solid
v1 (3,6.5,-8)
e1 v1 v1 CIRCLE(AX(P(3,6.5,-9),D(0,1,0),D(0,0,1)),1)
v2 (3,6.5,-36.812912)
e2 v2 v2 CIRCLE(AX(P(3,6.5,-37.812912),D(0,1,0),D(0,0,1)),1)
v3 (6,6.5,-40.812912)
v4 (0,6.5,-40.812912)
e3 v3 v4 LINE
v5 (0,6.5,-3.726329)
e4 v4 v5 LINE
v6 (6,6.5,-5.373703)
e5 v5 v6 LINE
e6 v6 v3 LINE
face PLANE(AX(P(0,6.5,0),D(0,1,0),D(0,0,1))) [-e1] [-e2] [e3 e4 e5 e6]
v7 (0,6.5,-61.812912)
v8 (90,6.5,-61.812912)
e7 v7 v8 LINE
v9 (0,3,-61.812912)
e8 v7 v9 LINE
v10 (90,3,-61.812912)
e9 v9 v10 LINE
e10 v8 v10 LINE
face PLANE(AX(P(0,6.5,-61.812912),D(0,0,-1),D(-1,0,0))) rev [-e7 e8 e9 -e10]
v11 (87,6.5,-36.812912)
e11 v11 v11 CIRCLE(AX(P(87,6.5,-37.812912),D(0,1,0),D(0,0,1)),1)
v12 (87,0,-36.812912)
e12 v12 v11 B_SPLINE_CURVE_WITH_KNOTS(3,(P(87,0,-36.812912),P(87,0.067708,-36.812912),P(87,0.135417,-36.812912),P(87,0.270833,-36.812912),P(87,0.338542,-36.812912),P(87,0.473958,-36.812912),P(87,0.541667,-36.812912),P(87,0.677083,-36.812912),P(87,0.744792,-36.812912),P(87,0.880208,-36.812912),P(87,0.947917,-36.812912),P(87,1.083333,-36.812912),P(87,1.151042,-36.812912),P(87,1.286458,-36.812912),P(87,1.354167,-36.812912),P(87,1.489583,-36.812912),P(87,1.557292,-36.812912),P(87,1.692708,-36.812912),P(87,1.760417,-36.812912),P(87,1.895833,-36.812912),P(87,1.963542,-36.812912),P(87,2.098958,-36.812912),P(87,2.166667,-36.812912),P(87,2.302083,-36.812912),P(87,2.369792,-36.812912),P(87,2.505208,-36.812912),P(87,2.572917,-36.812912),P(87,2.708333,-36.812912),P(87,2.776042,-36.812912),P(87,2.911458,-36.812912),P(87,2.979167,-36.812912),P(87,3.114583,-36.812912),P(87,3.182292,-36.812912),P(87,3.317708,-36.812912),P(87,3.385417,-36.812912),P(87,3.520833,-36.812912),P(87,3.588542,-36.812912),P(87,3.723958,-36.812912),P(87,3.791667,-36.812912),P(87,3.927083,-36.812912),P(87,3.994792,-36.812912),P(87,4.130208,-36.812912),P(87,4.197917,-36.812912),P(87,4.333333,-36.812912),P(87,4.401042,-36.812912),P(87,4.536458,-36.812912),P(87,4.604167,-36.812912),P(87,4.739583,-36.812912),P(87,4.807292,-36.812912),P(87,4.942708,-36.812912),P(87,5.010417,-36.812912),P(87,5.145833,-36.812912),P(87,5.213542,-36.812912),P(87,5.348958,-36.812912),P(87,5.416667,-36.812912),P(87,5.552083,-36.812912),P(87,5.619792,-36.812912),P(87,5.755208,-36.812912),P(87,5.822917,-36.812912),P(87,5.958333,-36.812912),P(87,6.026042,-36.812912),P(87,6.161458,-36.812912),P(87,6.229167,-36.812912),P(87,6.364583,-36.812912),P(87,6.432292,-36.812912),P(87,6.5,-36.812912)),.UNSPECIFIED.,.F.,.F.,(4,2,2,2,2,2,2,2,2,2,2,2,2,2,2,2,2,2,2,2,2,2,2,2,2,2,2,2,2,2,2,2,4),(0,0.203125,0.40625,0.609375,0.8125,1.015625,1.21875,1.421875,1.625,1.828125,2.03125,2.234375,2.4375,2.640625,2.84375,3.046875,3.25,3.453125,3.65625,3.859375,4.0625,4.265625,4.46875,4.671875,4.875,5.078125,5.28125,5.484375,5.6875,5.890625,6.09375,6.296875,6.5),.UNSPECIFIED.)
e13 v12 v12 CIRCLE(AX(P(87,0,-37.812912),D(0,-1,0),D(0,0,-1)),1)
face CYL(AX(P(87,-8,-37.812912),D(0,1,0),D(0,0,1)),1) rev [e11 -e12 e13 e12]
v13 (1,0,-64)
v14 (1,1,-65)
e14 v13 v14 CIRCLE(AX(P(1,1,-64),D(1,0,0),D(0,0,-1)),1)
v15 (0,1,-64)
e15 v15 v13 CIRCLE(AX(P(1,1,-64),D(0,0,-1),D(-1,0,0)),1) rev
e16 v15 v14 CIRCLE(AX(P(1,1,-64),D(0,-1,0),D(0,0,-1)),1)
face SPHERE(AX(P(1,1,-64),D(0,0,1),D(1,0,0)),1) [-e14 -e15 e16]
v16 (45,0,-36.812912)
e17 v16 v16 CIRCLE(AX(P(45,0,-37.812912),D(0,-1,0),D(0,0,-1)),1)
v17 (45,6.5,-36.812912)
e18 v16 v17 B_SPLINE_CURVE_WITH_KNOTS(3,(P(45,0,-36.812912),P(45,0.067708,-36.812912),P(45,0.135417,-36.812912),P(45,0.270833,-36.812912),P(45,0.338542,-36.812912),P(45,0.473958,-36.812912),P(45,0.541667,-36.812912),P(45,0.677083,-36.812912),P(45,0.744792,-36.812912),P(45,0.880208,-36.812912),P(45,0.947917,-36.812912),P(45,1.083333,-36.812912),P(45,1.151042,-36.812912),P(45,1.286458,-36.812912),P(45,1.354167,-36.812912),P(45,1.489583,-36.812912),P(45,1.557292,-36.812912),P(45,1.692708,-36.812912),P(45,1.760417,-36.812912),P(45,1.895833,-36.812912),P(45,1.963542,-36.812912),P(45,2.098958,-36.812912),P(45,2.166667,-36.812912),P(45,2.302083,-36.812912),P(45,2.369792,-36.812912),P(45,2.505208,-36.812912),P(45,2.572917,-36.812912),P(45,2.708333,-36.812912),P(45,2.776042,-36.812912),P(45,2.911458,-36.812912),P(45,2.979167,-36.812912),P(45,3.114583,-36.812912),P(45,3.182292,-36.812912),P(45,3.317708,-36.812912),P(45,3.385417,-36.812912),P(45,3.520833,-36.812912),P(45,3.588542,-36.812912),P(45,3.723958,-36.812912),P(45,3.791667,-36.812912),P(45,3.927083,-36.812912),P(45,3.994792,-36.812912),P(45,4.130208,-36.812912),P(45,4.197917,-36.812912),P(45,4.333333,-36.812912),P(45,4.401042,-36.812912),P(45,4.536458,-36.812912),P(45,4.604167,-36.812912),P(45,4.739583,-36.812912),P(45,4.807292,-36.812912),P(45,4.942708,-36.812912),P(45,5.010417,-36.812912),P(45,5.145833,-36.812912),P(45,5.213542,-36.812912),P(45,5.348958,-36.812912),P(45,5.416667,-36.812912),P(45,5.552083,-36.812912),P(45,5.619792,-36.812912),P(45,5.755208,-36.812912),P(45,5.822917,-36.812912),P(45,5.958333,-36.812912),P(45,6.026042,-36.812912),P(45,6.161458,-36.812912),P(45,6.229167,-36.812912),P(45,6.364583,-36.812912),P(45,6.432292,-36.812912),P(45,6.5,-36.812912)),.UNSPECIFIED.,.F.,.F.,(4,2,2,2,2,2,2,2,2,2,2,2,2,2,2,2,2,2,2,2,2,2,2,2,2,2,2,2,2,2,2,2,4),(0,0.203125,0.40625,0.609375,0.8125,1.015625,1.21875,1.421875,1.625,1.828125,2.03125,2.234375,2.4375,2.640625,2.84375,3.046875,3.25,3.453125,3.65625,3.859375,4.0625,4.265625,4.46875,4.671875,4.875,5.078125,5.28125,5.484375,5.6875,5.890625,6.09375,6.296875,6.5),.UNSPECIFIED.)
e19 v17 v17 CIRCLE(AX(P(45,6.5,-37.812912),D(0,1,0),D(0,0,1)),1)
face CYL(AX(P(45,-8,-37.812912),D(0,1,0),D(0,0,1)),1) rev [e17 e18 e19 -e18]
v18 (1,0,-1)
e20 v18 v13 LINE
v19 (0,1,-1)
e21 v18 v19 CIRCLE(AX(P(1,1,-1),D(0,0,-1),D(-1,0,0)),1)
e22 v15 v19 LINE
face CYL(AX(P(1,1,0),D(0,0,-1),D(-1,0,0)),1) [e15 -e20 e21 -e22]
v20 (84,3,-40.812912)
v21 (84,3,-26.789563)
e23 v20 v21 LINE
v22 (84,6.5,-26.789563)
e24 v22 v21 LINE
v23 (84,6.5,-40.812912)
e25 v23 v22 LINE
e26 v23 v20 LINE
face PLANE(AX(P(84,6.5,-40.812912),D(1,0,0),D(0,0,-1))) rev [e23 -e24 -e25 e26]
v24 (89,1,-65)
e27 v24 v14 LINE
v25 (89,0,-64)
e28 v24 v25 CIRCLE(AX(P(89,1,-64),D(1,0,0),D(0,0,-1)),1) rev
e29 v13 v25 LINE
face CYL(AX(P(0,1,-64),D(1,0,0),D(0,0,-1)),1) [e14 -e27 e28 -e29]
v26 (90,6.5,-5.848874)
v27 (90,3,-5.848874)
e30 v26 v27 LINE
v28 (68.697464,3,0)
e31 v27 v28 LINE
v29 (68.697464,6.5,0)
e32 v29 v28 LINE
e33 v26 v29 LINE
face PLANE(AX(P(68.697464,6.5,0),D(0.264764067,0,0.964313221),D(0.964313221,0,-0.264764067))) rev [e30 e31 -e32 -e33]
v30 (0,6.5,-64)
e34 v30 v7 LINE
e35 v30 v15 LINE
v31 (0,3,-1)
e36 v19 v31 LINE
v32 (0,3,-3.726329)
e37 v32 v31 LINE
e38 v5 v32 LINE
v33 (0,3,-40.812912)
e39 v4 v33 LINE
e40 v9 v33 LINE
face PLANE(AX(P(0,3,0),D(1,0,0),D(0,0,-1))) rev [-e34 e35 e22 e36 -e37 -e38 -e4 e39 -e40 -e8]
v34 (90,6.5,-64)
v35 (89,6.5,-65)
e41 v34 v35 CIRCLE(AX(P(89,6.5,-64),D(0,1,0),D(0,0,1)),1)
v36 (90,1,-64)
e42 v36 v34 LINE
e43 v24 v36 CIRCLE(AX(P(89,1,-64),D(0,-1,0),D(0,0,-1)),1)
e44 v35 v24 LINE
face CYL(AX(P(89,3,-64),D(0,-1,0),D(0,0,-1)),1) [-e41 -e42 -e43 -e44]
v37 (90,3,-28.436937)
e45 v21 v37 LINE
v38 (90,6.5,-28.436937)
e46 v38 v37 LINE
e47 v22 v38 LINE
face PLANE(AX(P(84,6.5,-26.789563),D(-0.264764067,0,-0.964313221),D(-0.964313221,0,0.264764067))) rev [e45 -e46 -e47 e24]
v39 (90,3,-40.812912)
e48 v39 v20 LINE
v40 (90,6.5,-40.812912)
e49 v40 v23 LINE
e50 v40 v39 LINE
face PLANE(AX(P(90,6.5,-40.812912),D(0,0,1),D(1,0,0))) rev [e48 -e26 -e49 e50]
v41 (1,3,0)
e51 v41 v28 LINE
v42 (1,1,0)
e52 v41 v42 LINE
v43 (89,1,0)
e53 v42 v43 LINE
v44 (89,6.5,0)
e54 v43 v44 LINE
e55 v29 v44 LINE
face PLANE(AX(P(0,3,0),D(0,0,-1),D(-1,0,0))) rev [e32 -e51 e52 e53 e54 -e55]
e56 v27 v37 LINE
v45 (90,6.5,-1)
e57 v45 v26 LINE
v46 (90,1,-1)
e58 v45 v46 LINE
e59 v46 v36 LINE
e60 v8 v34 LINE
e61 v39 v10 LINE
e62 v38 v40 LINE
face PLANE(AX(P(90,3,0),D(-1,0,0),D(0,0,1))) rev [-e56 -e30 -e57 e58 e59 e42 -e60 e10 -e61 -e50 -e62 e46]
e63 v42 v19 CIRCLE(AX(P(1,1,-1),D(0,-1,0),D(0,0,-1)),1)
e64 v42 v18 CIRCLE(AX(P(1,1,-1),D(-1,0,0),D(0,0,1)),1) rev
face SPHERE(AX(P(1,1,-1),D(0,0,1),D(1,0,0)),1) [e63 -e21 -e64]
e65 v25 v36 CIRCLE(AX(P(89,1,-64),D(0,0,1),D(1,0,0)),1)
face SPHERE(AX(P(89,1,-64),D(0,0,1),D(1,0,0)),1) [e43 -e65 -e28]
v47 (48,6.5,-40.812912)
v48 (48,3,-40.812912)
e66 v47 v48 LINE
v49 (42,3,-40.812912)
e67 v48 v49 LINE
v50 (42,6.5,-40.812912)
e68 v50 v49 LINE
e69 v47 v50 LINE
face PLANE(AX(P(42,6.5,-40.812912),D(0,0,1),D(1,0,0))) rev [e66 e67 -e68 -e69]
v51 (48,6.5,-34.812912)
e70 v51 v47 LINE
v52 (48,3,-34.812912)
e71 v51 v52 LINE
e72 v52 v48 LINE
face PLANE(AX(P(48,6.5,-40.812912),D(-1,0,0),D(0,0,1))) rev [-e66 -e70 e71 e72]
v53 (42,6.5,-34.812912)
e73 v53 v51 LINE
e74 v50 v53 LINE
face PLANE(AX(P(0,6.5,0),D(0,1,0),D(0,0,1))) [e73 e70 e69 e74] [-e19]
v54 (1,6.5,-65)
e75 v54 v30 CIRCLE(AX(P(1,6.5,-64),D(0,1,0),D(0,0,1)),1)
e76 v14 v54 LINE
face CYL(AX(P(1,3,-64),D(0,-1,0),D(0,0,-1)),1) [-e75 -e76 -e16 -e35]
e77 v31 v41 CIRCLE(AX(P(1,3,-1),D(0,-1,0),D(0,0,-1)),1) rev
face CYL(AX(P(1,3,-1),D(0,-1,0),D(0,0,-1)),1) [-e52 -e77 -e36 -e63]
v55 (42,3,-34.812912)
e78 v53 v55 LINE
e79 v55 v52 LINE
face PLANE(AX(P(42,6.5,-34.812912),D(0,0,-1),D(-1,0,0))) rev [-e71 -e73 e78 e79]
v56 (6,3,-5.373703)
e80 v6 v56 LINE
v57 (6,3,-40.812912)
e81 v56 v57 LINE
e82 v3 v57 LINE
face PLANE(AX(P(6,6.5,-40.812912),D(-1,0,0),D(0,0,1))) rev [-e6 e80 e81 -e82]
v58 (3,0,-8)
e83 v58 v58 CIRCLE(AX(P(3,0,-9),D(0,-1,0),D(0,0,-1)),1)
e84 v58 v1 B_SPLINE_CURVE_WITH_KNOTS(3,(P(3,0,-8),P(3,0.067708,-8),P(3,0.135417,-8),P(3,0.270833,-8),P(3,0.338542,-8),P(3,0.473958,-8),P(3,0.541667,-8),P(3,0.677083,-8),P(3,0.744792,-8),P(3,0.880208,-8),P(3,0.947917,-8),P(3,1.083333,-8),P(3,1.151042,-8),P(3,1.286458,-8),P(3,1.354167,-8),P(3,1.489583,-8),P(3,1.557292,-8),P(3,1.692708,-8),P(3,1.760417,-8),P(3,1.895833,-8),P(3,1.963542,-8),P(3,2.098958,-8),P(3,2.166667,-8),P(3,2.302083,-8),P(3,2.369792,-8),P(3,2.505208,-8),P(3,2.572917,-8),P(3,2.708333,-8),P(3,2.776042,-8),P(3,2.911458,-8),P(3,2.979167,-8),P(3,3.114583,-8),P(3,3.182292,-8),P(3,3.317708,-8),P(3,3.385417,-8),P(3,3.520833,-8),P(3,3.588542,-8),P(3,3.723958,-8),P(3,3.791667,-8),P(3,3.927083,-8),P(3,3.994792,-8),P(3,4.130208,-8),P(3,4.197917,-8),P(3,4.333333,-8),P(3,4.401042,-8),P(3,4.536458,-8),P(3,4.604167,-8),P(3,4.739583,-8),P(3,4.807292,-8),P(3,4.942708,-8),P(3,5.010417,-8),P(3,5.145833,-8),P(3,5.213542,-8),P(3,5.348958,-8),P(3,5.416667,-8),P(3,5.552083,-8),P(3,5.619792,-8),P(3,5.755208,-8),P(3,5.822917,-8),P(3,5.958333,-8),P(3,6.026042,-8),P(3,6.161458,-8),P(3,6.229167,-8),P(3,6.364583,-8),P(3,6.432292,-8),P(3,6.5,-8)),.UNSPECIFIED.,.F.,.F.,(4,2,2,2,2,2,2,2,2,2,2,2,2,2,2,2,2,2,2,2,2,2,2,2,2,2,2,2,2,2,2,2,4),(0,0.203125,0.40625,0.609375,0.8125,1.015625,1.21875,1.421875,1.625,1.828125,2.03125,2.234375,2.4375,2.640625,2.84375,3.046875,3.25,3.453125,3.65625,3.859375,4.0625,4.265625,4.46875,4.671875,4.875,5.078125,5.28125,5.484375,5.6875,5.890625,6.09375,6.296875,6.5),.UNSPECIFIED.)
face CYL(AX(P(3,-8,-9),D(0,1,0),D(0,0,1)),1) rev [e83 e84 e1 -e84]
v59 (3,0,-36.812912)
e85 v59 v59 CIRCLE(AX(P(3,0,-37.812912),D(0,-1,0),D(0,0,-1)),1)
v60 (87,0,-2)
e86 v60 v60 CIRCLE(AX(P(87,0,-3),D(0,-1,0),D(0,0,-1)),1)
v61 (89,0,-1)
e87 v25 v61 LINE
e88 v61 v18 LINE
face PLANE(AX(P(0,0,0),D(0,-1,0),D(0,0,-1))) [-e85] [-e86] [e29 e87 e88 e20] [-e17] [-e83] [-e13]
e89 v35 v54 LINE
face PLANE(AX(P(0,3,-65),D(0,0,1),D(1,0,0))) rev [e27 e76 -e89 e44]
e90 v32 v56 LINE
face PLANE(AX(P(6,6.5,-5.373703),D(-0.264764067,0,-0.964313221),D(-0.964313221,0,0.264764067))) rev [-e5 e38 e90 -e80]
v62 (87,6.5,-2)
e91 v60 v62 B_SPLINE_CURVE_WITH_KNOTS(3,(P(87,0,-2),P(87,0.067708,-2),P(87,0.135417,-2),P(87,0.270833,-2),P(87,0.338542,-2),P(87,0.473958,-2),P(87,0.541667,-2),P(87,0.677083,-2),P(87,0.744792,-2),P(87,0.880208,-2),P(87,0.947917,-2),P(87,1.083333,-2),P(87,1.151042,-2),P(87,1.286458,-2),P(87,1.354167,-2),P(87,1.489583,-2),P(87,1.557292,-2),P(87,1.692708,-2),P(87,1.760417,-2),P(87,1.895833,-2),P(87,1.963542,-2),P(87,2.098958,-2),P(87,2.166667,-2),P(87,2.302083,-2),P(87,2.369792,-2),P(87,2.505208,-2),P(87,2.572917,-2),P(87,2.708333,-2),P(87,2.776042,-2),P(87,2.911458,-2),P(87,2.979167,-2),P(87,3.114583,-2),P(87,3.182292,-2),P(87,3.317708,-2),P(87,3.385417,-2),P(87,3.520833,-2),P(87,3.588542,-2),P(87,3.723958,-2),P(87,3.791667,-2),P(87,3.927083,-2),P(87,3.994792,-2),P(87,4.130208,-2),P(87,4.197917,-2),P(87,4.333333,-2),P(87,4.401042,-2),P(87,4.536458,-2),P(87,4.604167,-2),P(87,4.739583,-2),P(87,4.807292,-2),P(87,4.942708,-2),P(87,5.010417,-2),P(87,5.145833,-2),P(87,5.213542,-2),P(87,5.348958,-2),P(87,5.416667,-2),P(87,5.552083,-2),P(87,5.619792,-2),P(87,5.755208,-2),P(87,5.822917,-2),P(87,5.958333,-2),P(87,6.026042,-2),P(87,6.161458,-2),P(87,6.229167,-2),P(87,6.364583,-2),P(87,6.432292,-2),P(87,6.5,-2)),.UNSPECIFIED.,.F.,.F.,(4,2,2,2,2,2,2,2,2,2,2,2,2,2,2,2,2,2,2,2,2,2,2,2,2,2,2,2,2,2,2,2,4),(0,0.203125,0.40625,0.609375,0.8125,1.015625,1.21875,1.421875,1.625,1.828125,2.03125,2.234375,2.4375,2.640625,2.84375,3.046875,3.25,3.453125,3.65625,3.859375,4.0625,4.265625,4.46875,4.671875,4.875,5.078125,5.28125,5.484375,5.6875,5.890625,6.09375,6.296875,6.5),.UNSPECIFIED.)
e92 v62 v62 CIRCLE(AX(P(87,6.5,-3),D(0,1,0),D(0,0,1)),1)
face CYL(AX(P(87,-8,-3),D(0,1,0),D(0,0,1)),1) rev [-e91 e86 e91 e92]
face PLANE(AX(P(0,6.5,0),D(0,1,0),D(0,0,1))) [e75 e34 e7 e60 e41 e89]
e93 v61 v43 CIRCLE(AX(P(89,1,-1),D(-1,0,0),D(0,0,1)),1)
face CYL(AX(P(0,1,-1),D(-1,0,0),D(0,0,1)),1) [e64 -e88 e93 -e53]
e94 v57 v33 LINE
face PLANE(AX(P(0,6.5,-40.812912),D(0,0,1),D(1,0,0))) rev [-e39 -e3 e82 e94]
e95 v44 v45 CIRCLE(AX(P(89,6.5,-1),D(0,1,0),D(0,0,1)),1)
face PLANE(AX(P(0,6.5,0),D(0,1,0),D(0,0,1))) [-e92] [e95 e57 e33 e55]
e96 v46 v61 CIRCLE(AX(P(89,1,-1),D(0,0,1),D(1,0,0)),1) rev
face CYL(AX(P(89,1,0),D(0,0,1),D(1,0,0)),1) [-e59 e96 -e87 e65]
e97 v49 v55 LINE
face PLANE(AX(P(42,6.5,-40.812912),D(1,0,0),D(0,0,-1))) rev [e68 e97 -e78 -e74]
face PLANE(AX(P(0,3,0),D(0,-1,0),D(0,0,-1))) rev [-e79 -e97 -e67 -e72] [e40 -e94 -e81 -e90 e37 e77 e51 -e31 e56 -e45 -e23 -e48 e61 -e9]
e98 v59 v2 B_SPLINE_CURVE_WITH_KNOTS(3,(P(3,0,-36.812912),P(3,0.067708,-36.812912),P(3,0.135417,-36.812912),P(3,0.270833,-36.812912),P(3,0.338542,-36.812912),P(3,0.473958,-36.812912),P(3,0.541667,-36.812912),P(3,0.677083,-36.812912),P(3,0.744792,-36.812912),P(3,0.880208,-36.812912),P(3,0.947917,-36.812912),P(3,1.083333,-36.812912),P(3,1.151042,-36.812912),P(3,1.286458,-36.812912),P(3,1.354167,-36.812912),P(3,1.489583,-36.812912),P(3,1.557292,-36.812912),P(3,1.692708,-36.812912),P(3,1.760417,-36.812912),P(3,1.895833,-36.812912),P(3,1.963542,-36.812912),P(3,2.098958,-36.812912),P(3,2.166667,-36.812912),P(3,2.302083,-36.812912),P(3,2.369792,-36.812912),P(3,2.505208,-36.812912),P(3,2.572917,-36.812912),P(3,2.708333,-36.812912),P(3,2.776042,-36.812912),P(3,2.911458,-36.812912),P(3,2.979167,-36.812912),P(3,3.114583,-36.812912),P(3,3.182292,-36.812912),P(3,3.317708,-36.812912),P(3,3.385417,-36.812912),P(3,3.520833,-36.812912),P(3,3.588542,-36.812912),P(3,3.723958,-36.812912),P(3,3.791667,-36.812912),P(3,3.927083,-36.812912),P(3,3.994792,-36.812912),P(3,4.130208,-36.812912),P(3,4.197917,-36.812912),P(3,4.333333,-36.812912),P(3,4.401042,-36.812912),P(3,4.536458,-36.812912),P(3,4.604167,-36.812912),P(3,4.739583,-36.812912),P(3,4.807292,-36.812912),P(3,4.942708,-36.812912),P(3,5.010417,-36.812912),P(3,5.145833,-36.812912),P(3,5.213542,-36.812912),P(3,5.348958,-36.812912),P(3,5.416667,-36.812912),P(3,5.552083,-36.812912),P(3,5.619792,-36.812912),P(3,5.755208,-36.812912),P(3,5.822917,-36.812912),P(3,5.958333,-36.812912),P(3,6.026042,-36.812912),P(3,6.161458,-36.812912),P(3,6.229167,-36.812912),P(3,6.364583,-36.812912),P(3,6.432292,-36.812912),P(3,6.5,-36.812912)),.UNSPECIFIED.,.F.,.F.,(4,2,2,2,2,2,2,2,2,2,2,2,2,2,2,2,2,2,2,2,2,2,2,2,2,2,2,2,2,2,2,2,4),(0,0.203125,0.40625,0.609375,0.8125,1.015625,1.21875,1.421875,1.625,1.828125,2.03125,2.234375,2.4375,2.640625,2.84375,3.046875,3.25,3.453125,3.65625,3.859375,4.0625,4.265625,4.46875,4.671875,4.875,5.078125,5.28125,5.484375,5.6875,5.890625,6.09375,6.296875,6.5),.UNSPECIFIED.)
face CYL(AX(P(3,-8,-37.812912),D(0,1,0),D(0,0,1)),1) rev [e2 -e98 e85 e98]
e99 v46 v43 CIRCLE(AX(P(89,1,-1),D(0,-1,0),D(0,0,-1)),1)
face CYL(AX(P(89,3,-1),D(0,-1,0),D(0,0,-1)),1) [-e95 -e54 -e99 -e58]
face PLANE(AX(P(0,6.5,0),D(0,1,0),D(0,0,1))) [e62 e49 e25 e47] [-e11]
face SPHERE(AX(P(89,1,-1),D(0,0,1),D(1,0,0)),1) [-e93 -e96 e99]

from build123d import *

# Parameters (mm, degrees)
SKETCH1_W           = 90
SKETCH1_H           = 65
BOSS_EXTRUDE1_DEPTH = 3
SKETCH2_W           = 90
SKETCH2_H           = 3.187087834
SKETCH2_W_2         = 6
SKETCH2_H_2         = 6
BOSS_EXTRUDE2_DEPTH = 3.5
SKETCH3_R           = 1
CUT_EXTRUDE1_DEPTH  = 14.5
FILLET1_R           = 1
FILLET2_R           = 1


with BuildPart() as part:
    # Sketch1 → Boss-Extrude1 (new body)
    with BuildSketch(Plane(origin=(0, 0, 0), x_dir=(1, 0, 0), z_dir=(0, 1, 0))):
        with Locations((45, 32.5)):
            Rectangle(SKETCH1_W, SKETCH1_H)
    extrude(amount=BOSS_EXTRUDE1_DEPTH)

    # Sketch2 → Boss-Extrude2 (add)
    with BuildSketch(Plane(origin=(0, 3, 0), x_dir=(1, 0, 0), z_dir=(0, 1, 0))):
        with Locations((45, 63.406456083)):
            Rectangle(SKETCH2_W, SKETCH2_H)
        Polygon((0, 40.812912166), (6, 40.812912166), (6, 5.373702529), (4, 4.824577906), (0, 3.72632866), align=None)
        Polygon((90, 40.812912166), (84, 40.812912166), (84, 26.789562822), (86, 27.338687445), (90, 28.436936691), align=None)
        with Locations((45, 37.812912166)):
            Rectangle(SKETCH2_W_2, SKETCH2_H_2)
        Polygon((68.697463874, 0), (90, 5.848873559), (90, 0), align=None)
    extrude(amount=BOSS_EXTRUDE2_DEPTH)

    # Sketch3 → Cut-Extrude1 (cut)
    with BuildSketch(Plane(origin=(0, 6.5, 0), x_dir=(1, 0, 0), z_dir=(0, 1, 0))):
        with Locations(Location((45, 37.812912166, 0), (0, 0, 270))):
            Circle(SKETCH3_R)
        with Locations(Location((3, 37.812912166, 0), (0, 0, 270))):
            Circle(SKETCH3_R)
        with Locations(Location((3, 9, 0), (0, 0, 270))):
            Circle(SKETCH3_R)
        with Locations(Location((87, 37.812912166, 0), (0, 0, 270))):
            Circle(SKETCH3_R)
        with Locations(Location((87, 3, 0), (0, 0, 270))):
            Circle(SKETCH3_R)
    extrude(amount=-CUT_EXTRUDE1_DEPTH, mode=Mode.SUBTRACT)

    # Fillet1
    fillet1_edges = [part.edges().sort_by_distance(p)[0] for p in [
        (45, 0, -65),
        (90, 0, -32.5),
        (45, 0, 0),
        (0, 0, -32.5),
    ]]
    fillet(fillet1_edges, radius=FILLET1_R)

    # Fillet2
    # the kernel refuses this fillet: 1 mm, written as the material it takes off along each edge
    with BuildSketch(Plane(origin=(89, 1, -1), x_dir=(1, 0, 0), z_dir=(0, 0, 1))) as fillet2_piece_1_section:
        Polygon((0, 0), (FILLET2_R, 0), (FILLET2_R, -FILLET2_R), (0, -FILLET2_R), align=None)
    fillet2_piece_1 = extrude(amount=FILLET2_R, mode=Mode.PRIVATE)
    fillet2_piece_1 = fillet2_piece_1 - Plane(origin=(89, 1, -1), x_dir=(-0.7071067811865475, 0.7071067811865475, 0), z_dir=(0, 0, 1)) * Sphere(FILLET2_R, mode=Mode.PRIVATE)
    add(fillet2_piece_1, mode=Mode.SUBTRACT)
    with BuildSketch(Plane(origin=(1, 1, -1), x_dir=(-1, 0, 0), z_dir=(0, 0, 1))) as fillet2_piece_2_section:
        Polygon((0, 0), (FILLET2_R, 0), (FILLET2_R, FILLET2_R), (0, FILLET2_R), align=None)
    fillet2_piece_2 = extrude(amount=FILLET2_R, mode=Mode.PRIVATE)
    fillet2_piece_2 = fillet2_piece_2 - Plane(origin=(1, 1, -1), x_dir=(0.7071067811865475, 0.7071067811865475, 0), z_dir=(0, 0, 1)) * Sphere(FILLET2_R, mode=Mode.PRIVATE)
    add(fillet2_piece_2, mode=Mode.SUBTRACT)
    with BuildSketch(Plane(origin=(89, 1, -64), x_dir=(0, 0, -1), z_dir=(1, 0, 0))) as fillet2_piece_3_section:
        Polygon((0, 0), (FILLET2_R, 0), (FILLET2_R, -FILLET2_R), (0, -FILLET2_R), align=None)
    fillet2_piece_3 = extrude(amount=FILLET2_R, mode=Mode.PRIVATE)
    fillet2_piece_3 = fillet2_piece_3 - Plane(origin=(89, 1, -64), x_dir=(0, 0.7071067811865475, 0.7071067811865475), z_dir=(1, 0, 0)) * Sphere(FILLET2_R, mode=Mode.PRIVATE)
    add(fillet2_piece_3, mode=Mode.SUBTRACT)
    with BuildSketch(Plane(origin=(1, 1, -64), x_dir=(0, 0, -1), z_dir=(-1, 0, 0))) as fillet2_piece_4_section:
        Polygon((0, 0), (FILLET2_R, 0), (FILLET2_R, FILLET2_R), (0, FILLET2_R), align=None)
    fillet2_piece_4 = extrude(amount=FILLET2_R, mode=Mode.PRIVATE)
    fillet2_piece_4 = fillet2_piece_4 - Plane(origin=(1, 1, -64), x_dir=(0, 0.7071067811865475, 0.7071067811865475), z_dir=(-1, 0, 0)) * Sphere(FILLET2_R, mode=Mode.PRIVATE)
    add(fillet2_piece_4, mode=Mode.SUBTRACT)
    with BuildSketch(Plane(origin=(0, 9, -65), x_dir=(0, 0, 1), z_dir=(0, -1, 0)), Plane(origin=(90, 1, -65), x_dir=(0, 0, 1), z_dir=(0, 1, 0))) as fillet2_piece_5:
        with BuildLine():
            CenterArc((FILLET2_R, -FILLET2_R), FILLET2_R, 90, 90)
            Line((0, -FILLET2_R), (0, 0))
            Line((0, 0), (FILLET2_R, 0))
        make_face()
    extrude(amount=8, mode=Mode.SUBTRACT)
    with BuildSketch(Plane(origin=(90, 3, 0), x_dir=(-1.5916157280951914e-11, 0, -1.0), z_dir=(0, 1, 0))) as fillet2_piece_6:
        with BuildLine():
            CenterArc((FILLET2_R, FILLET2_R), FILLET2_R, 179.999999999, 90)
            Line((0, FILLET2_R), (0, 0))
            Line((0, 0), (FILLET2_R, 0))
        make_face()
    extrude(amount=6, mode=Mode.SUBTRACT)
    with BuildSketch(Plane(origin=(0, 1, 0), x_dir=(1, 0, 0), z_dir=(0, 1, 0))) as fillet2_piece_7:
        with BuildLine():
            CenterArc((FILLET2_R, FILLET2_R), FILLET2_R, 180, 90)
            Line((0, FILLET2_R), (0, 0))
            Line((0, 0), (FILLET2_R, 0))
        make_face()
    extrude(amount=4.5, mode=Mode.SUBTRACT)
    with BuildSketch(Plane(origin=(90, 1, 0), x_dir=(-1, 0, 0), z_dir=(0, 1, 0))) as fillet2_piece_8:
        with BuildLine():
            CenterArc((FILLET2_R, -FILLET2_R), FILLET2_R, 90, 90)
            Line((0, -FILLET2_R), (0, 0))
            Line((0, 0), (FILLET2_R, 0))
        make_face()
    extrude(amount=2, mode=Mode.SUBTRACT)


solid = part.part
